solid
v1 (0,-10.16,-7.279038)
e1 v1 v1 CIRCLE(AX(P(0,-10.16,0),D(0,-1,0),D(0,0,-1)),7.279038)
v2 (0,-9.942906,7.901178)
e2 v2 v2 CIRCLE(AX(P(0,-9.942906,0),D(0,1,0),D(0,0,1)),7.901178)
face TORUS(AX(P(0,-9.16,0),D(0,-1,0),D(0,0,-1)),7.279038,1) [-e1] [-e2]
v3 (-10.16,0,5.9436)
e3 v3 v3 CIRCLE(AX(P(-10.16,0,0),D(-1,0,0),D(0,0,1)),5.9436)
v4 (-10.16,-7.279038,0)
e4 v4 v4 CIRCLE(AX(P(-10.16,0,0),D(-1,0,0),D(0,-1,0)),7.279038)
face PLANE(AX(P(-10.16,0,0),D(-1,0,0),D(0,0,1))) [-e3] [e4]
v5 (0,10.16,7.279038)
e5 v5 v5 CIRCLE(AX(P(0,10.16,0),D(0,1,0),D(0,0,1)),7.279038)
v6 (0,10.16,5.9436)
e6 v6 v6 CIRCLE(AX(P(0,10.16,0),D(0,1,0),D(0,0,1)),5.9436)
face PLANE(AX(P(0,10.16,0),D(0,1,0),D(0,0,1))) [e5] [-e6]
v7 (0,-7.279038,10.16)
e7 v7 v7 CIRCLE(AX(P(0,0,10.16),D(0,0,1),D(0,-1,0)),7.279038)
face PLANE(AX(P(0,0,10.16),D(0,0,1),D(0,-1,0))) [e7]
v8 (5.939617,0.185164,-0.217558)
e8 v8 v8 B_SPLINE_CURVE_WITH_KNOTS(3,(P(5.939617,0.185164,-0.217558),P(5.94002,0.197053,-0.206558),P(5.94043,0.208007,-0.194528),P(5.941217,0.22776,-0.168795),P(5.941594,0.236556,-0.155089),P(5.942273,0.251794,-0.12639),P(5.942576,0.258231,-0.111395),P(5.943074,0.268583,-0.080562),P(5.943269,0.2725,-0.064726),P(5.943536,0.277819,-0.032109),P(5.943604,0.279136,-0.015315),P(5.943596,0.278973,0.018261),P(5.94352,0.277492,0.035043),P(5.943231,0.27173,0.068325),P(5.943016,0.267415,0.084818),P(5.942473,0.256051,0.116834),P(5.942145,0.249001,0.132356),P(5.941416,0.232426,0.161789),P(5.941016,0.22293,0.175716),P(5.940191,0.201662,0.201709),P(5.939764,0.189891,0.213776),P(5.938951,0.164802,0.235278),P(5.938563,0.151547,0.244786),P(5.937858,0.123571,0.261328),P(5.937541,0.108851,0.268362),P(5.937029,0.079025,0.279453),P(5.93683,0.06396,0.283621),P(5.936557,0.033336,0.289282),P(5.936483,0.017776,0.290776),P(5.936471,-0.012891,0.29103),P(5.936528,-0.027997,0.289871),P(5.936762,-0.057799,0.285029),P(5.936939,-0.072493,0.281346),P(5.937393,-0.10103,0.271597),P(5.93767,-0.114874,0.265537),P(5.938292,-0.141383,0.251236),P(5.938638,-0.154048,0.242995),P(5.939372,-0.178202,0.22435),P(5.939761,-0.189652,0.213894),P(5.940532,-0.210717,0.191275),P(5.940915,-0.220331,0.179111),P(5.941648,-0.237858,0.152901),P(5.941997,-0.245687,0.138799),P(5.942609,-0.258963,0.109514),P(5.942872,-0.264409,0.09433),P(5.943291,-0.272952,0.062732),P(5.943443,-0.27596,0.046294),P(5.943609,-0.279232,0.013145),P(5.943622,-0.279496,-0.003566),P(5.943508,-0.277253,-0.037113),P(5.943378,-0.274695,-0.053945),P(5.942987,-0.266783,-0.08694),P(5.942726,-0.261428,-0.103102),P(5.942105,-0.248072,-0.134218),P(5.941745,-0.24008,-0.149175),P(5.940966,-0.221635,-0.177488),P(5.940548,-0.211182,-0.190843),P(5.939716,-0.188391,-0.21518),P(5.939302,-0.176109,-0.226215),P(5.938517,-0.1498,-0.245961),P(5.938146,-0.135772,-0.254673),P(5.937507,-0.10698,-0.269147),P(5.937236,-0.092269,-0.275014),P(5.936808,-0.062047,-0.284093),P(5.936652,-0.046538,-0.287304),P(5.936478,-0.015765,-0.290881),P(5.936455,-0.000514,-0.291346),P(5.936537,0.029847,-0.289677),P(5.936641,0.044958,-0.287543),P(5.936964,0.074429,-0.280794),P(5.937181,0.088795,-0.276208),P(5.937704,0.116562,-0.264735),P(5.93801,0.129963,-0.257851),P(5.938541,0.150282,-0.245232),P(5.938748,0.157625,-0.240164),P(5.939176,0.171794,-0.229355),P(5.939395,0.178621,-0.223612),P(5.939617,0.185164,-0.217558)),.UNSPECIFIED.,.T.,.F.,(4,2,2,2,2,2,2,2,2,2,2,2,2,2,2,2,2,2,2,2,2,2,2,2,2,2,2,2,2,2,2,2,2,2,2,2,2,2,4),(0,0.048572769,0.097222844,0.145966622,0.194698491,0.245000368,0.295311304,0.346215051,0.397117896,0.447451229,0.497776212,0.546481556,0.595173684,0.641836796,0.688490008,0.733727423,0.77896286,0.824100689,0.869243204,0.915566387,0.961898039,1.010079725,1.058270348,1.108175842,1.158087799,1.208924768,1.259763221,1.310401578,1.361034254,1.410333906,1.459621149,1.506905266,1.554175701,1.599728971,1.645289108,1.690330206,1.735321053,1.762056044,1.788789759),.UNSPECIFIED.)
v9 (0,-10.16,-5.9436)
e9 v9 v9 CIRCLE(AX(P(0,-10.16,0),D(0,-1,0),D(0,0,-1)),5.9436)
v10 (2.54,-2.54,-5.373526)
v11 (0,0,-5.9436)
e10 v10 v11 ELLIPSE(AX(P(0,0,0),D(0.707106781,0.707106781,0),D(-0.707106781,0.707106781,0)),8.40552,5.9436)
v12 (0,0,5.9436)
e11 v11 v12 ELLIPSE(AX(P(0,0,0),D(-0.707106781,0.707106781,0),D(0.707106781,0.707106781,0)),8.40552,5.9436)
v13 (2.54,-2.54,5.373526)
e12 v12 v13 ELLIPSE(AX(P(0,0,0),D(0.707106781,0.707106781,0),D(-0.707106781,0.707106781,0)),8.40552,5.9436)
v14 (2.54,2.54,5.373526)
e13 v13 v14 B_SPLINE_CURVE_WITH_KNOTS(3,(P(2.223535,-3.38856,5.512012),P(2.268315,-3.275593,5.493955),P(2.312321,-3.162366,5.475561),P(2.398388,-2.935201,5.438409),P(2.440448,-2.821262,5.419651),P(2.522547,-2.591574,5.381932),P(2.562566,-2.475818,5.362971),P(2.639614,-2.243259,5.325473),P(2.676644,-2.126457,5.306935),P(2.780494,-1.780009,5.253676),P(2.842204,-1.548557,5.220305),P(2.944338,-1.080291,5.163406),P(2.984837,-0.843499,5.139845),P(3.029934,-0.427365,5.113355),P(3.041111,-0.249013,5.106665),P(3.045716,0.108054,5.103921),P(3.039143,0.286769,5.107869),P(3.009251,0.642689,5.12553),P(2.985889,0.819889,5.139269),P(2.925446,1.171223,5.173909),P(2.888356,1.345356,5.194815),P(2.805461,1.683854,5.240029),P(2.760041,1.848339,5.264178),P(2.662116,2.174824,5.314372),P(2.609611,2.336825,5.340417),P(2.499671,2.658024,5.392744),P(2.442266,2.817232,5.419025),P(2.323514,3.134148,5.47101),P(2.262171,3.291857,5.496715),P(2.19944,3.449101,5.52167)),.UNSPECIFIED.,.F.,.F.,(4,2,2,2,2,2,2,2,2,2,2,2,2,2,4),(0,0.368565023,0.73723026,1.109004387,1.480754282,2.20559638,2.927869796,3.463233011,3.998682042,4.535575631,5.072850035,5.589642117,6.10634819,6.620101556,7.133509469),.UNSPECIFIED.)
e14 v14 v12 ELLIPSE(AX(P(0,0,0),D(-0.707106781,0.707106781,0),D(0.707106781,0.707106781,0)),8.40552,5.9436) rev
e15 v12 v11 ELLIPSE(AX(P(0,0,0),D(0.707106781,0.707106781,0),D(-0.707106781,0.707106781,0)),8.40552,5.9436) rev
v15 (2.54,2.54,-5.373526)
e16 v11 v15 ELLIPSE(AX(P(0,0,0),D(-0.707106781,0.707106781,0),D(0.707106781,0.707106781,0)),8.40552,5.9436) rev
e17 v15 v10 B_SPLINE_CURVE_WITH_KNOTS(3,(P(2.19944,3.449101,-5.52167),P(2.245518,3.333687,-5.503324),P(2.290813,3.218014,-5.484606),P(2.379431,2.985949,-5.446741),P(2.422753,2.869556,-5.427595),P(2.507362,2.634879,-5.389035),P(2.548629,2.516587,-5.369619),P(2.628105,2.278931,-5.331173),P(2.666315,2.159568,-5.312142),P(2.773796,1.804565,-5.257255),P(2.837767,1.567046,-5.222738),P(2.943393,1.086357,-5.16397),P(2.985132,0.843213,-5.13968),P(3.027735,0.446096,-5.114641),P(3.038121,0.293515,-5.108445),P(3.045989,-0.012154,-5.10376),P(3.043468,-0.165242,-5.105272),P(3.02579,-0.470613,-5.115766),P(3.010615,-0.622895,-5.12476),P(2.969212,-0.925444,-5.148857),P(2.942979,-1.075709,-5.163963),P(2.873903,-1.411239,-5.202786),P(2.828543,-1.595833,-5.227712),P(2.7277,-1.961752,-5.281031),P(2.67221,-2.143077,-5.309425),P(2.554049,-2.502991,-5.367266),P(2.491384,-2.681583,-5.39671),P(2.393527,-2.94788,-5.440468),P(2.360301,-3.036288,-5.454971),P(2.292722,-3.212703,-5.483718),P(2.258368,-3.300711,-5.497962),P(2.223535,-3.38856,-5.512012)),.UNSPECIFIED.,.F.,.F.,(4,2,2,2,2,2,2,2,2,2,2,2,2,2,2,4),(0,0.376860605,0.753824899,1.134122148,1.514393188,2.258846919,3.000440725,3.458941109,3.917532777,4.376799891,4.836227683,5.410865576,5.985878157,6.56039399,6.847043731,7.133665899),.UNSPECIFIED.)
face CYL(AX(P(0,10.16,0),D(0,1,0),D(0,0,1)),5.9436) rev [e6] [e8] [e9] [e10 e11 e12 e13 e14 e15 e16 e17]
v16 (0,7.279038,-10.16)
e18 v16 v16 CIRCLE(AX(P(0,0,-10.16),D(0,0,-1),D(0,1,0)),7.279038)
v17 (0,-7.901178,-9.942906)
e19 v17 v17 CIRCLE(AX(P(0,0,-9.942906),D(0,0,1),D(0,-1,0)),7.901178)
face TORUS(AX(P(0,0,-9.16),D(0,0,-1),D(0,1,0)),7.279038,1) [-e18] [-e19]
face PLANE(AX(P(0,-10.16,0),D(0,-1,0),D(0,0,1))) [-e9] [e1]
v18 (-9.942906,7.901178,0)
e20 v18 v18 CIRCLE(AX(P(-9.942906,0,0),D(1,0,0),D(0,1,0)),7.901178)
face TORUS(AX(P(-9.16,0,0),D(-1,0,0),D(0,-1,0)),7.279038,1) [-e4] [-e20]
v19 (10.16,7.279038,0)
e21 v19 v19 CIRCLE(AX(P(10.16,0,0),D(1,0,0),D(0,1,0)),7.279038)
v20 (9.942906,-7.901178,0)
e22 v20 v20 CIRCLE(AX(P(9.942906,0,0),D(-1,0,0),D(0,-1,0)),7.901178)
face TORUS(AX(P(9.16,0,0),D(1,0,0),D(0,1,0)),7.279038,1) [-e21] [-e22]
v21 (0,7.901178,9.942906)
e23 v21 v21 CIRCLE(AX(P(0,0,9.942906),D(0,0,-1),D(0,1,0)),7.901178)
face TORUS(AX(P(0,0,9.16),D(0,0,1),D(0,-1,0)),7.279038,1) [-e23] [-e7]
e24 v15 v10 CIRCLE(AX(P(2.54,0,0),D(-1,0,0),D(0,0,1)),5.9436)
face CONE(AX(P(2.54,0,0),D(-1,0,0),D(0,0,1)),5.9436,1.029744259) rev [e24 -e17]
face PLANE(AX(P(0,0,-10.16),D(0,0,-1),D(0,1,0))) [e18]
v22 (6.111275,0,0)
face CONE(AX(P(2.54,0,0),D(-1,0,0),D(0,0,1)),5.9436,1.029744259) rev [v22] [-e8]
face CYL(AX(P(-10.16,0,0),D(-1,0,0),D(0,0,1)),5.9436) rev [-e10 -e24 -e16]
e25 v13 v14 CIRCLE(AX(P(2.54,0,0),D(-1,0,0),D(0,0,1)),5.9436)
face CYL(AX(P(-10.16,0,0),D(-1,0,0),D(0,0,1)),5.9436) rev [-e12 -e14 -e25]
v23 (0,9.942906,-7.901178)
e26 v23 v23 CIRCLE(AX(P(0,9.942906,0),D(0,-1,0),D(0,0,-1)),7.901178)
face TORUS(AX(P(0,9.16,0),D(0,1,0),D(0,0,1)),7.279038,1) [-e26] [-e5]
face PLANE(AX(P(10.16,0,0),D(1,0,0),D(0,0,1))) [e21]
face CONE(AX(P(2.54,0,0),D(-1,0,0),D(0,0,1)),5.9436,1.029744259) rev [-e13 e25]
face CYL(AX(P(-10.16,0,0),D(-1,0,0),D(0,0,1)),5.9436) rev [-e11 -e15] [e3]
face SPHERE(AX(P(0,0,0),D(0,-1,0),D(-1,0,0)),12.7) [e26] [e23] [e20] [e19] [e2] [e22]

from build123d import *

# Parameters (mm, degrees)
R_P_TITION_START                   = -7.62
R_P_TITION_CIRCULAIRE5_OUTLINE_W   = 3.84
R_P_TITION_CIRCULAIRE5_OUTLINE_H   = 18
R_P_TITION_CIRCULAIRE5_DEPTH       = 15.24
R_P_TITION_START_2                 = -12.7
R_P_TITION_CIRCULAIRE5_2_OUTLINE_W = 19.16
R_P_TITION_CIRCULAIRE5_2_OUTLINE_H = 18
R_P_TITION_CIRCULAIRE5_2_DEPTH     = 2.54
R_P_TITION_START_3                 = 10.16
R_P_TITION_CIRCULAIRE5_3_OUTLINE_W = 19.16
R_P_TITION_CIRCULAIRE5_3_OUTLINE_H = 18
R_P_TITION_CIRCULAIRE5_3_DEPTH     = 2.54
R_P_TITION_CIRCULAIRE6_OUTLINE_W   = 18
R_P_TITION_CIRCULAIRE6_OUTLINE_H   = 18
R_P_TITION_CIRCULAIRE6_DEPTH       = 2.54
R_P_TITION_CIRCULAIRE6_2_OUTLINE_W = 18
R_P_TITION_CIRCULAIRE6_2_OUTLINE_H = 18
R_P_TITION_CIRCULAIRE6_2_DEPTH     = 2.54
CONG_1_R                           = 1
R_P_TITION_CIRCULAIRE7_COUNT       = 3
R_P_TITION_CIRCULAIRE7_ANGLE       = 180


# Read off the part's stored shape, not the designer's step: Répétition circulaire5, Répétition circulaire6
with BuildPart() as part:
    # Esquisse1 → Révolution1 (revolve)
    with BuildSketch(Plane.XY):
        with BuildLine():
            Line((0, -12.7), (0, 12.7))
            ThreePointArc((0, 12.7), (12.7, 0), (0, -12.7))
        make_face()
    revolve(axis=Axis((0, -12.7, 0), (0, 1, 0)))

    # Enlèv. mat.-Surface1
    split(bisect_by=Plane(origin=(0, 10.16, 0), x_dir=(1, 0, 0), z_dir=(0, 1, 0)), keep=Keep.BOTTOM)

    # Répétition circulaire5 outline → Répétition circulaire5 (cut)
    with BuildSketch(Plane.YZ.offset(R_P_TITION_START)):
        with Locations((-12.08, 0)):
            Rectangle(R_P_TITION_CIRCULAIRE5_OUTLINE_W, R_P_TITION_CIRCULAIRE5_OUTLINE_H)
    extrude(amount=R_P_TITION_CIRCULAIRE5_DEPTH, mode=Mode.SUBTRACT)

    # R_p_tition circulaire5 2 outline → R_p_tition circulaire5 2 (cut)
    with BuildSketch(Plane.YZ.offset(R_P_TITION_START_2)):
        with Locations((-0.58, 0)):
            Rectangle(R_P_TITION_CIRCULAIRE5_2_OUTLINE_W, R_P_TITION_CIRCULAIRE5_2_OUTLINE_H)
    extrude(amount=R_P_TITION_CIRCULAIRE5_2_DEPTH, mode=Mode.SUBTRACT)

    # R_p_tition circulaire5 3 outline → R_p_tition circulaire5 3 (cut)
    with BuildSketch(Plane.YZ.offset(R_P_TITION_START_3)):
        with Locations((-0.58, 0)):
            Rectangle(R_P_TITION_CIRCULAIRE5_3_OUTLINE_W, R_P_TITION_CIRCULAIRE5_3_OUTLINE_H)
    extrude(amount=R_P_TITION_CIRCULAIRE5_3_DEPTH, mode=Mode.SUBTRACT)

    # Répétition circulaire6 outline → Répétition circulaire6 (cut)
    with BuildSketch(Plane.XY.offset(R_P_TITION_START_2)):
        Rectangle(R_P_TITION_CIRCULAIRE6_OUTLINE_W, R_P_TITION_CIRCULAIRE6_OUTLINE_H)
    extrude(amount=R_P_TITION_CIRCULAIRE6_DEPTH, mode=Mode.SUBTRACT)

    # R_p_tition circulaire6 2 outline → R_p_tition circulaire6 2 (cut)
    with BuildSketch(Plane.XY.offset(R_P_TITION_START_3)):
        Rectangle(R_P_TITION_CIRCULAIRE6_2_OUTLINE_W, R_P_TITION_CIRCULAIRE6_2_OUTLINE_H)
    extrude(amount=R_P_TITION_CIRCULAIRE6_2_DEPTH, mode=Mode.SUBTRACT)

    # Congé1
    cong_1_edges = [part.edges().sort_by_distance(p)[0] for p in [
        (-10.16, 0, -7.62),
        (-7.62, -10.16, 0),
        (10.16, 0, -7.62),
        (0, 7.62, -10.16),
        (0, 7.62, 10.16),
        (-7.62, 10.16, 0),
    ]]
    fillet(cong_1_edges, radius=CONG_1_R)

    # Esquisse2 → Trou taraudé 1/4-18 NPSM1 (revolve, cut)
    with BuildSketch(Plane(origin=(0, 10.16, 0), x_dir=(0, 0, 1), z_dir=(1, 0, 0))):
        Polygon((0, 0), (0, 16.271275175), (5.9436, 12.7), (5.9436, 0), align=None)
    trou_taraud_1_4_18_npsm1 = revolve(axis=Axis((0, 16.51, 0), (0, -1, 0)), mode=Mode.SUBTRACT)

    # Répétition circulaire7: Trou taraudé 1/4-18 NPSM1 ×3 about axis
    r_p_tition_circulaire7_axis = Axis((0, 0, -11.176), (0, 0, 1))
    for i in range(1, R_P_TITION_CIRCULAIRE7_COUNT):
        add(trou_taraud_1_4_18_npsm1.rotate(r_p_tition_circulaire7_axis, i * R_P_TITION_CIRCULAIRE7_ANGLE / (R_P_TITION_CIRCULAIRE7_COUNT - 1)), mode=Mode.SUBTRACT)


solid = part.part
